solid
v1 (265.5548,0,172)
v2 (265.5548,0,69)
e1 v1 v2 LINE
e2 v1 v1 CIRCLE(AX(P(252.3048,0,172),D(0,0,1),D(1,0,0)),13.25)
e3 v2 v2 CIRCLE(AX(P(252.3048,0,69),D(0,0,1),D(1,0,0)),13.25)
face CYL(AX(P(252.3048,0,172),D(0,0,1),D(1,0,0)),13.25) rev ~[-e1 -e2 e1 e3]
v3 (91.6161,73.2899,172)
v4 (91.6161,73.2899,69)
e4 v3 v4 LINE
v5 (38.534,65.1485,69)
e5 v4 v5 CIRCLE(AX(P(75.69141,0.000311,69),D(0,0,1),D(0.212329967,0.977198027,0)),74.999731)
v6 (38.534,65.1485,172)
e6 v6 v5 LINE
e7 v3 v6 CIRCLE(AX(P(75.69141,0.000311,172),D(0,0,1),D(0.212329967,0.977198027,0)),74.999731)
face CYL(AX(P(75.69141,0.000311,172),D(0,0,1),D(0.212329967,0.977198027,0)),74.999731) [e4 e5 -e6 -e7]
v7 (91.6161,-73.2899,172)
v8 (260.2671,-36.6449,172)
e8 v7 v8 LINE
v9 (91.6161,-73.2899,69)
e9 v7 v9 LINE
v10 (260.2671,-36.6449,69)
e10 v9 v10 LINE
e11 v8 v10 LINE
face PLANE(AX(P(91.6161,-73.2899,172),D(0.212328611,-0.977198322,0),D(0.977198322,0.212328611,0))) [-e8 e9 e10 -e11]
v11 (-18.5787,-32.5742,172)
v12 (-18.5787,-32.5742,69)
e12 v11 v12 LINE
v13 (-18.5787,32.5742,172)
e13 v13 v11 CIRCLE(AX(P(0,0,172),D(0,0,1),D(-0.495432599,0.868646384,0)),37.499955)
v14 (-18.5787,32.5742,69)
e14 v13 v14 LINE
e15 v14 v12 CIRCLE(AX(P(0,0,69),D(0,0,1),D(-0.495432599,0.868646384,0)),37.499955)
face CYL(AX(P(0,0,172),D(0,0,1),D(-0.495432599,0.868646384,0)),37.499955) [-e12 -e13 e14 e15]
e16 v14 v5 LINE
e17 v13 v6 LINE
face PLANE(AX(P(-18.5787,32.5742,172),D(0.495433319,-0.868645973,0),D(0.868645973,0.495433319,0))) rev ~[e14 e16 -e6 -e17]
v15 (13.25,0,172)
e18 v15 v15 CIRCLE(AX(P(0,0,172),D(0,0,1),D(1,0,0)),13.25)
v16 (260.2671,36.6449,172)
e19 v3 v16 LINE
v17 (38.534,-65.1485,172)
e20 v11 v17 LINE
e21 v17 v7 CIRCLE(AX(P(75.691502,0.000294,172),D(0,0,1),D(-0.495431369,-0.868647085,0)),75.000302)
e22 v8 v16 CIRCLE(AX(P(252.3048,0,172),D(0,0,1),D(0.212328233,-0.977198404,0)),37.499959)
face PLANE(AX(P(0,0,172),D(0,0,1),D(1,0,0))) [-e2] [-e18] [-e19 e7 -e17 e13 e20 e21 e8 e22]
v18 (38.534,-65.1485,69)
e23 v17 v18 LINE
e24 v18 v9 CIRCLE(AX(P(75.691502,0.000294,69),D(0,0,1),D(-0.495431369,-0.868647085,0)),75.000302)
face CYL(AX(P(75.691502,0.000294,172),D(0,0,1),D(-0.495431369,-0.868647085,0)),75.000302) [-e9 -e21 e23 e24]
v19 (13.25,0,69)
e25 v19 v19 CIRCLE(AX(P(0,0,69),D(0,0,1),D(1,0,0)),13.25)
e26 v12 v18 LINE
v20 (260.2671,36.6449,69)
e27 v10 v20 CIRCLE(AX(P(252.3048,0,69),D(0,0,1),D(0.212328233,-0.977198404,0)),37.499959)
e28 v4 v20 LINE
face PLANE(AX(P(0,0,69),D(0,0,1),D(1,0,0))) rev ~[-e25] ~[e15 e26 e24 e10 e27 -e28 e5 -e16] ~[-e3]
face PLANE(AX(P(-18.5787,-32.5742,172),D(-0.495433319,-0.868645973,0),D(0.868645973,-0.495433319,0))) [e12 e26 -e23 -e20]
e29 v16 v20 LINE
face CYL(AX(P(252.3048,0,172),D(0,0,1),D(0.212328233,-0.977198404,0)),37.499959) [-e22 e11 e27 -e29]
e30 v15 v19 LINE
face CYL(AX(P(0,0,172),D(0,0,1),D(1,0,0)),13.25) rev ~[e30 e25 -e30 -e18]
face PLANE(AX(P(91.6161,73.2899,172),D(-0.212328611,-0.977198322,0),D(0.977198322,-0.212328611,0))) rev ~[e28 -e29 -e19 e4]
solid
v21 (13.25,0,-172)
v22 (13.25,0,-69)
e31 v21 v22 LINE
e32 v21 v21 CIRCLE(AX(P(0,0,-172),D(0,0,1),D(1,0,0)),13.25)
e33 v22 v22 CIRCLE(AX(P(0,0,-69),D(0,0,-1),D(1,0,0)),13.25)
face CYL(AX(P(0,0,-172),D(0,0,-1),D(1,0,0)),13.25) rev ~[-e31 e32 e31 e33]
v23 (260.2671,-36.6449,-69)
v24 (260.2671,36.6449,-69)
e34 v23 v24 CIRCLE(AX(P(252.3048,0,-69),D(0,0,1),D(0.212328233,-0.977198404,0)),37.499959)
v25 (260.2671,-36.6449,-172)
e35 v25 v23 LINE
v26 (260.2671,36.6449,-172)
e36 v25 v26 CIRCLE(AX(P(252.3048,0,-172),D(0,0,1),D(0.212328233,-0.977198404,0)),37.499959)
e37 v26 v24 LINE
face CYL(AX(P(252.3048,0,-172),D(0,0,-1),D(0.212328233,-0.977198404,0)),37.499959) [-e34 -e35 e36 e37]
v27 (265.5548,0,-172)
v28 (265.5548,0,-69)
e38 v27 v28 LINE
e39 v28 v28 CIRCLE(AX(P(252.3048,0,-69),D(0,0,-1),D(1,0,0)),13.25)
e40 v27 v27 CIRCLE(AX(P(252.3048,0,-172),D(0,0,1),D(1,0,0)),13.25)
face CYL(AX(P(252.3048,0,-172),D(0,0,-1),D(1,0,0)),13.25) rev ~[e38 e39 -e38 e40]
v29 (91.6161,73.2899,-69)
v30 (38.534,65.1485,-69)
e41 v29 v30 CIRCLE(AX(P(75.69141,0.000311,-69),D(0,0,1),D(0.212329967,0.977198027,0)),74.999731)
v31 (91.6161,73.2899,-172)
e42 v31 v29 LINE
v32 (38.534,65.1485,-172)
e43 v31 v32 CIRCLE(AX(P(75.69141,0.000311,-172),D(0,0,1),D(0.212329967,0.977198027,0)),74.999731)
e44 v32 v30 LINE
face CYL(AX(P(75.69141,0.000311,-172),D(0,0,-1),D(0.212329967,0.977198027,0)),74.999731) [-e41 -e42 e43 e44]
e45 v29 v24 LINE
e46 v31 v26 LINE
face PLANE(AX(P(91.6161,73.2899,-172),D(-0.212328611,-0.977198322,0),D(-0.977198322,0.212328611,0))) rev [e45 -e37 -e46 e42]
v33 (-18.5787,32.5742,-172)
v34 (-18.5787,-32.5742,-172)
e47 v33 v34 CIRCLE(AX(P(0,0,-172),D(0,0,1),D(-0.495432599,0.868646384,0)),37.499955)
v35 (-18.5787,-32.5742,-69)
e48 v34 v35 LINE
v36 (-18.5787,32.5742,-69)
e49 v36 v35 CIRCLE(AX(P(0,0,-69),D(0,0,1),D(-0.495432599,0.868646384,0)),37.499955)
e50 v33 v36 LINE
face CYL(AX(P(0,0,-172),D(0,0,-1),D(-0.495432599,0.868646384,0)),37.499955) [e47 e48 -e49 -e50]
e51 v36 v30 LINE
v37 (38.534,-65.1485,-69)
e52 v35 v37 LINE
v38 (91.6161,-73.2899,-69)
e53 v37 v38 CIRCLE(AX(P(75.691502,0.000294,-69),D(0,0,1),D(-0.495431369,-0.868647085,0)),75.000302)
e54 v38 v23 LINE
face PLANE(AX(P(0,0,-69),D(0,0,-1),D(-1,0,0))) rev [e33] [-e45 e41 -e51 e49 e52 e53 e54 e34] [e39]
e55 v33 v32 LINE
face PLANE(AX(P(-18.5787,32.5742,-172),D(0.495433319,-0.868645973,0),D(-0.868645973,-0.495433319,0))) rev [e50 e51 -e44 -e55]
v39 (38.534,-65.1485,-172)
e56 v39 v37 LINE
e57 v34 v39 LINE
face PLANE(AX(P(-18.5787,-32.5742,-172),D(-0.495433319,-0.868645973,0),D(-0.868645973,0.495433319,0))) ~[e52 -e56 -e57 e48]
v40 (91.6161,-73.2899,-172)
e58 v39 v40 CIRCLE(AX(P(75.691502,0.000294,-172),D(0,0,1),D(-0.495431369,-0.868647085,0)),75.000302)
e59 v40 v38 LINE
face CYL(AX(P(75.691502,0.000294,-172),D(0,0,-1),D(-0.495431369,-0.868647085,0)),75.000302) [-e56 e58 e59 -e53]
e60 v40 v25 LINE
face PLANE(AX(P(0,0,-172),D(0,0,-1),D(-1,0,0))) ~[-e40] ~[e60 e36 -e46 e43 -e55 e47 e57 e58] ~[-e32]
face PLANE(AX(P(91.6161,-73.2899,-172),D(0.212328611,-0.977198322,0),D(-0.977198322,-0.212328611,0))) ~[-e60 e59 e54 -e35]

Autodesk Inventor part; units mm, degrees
ref_plane "YZ Plane" through (0, 0, 0) normal (1, 0, 0) x (0, 1, 0)
ref_plane "XZ Plane" through (0, 0, 0) normal (0, 1, 0) x (-1, 0, 0)
ref_plane "工作平面1" through (0, 0, 172) normal (0, 0, 1) x (1, 0, 0)
sketch "草圖1" plane through (0, 0, 172) normal (0, 0, 1) x (1, 0, 0)
  line L0 (0, 0) -> (252.3048, 0) construction
  arc A0 (-18.5787, 32.5742) -> (-18.5787, -32.5742) centre (0, 0) ccw
  arc A1 (260.2671, -36.6449) -> (260.2671, 36.6449) centre (252.3048, 0) ccw
  line L1 (-18.5787, -32.5742) -> (38.534, -65.1485)
  line L2 (91.6161, 73.2899) -> (260.2671, 36.6449)
  line L3 (-18.5787, 32.5742) -> (38.534, 65.1485)
  line L4 (91.6161, -73.2899) -> (260.2671, -36.6449)
  arc A2 (38.534, -65.1485) -> (91.6161, -73.2899) centre (75.6914, 0) ccw
  arc A3 (91.6161, 73.2899) -> (38.534, 65.1485) centre (75.6914, 0) ccw
  dimension "d3" = 252.3048
  dimension "d4" = 75
  dimension "d6" = 75
  dimension "d51" = 75.6914
  dimension "d52" = 75
extrude "擠出1" add sketch "草圖1" against normal blind 103
sketch "草圖2" plane through (0, 0, 172) normal (0, 0, 1) x (1, 0, 0)
  arc A0 (-18.5787, 32.5742) -> (-18.5787, -32.5742) centre (0, 0) ccw projected
  circle A1 centre (0, 0) radius 13.25
  arc A2 (260.2671, -36.6449) -> (260.2671, 36.6449) centre (252.3048, 0) ccw projected
  circle A3 centre (252.3048, 0) radius 13.25
  point P0 (-10.9663, -35.8607)
  point P1 (-34.5251, 14.6378)
  point P2 (444.0649, 33.6154)
  point P3 (432.144, -37.2043)
  dimension "d11" = 26.5
  dimension "d13" = 26.5
extrude "擠出2" cut sketch "草圖2" against normal through all
sketch "草圖3" plane through (270.4933, 34.423, 172) normal (0.2123282, 0.9771984, 0) x (0.9771984, -0.2123282, 0)
  line L0 (-10.4648, 0) -> (-10.4648, 103) projected
  point P0 (-257.0166, 172)
  point P1 (-10.4648, 51.5)
  point P2 (-10.4648, 51.5)
hole "孔1" [suppressed]
sketch "草圖4" plane through (-8.9965, 38.0395, 172) normal (-0.4954325, 0.8686464, 0) x (0.8686464, 0.4954325, 0)
  line L0 (-11.0312, 0) -> (-11.0312, 103) projected
  point P0 (-11.0312, 172)
  point P1 (-11.0312, 51.5)
  point P2 (-11.0312, 51.5)
hole "孔2" [suppressed]
sketch "草圖6" plane through (-18.5787, -32.5742, 69) normal (-0.4954325, -0.8686464, 0) x (0.8686464, -0.4954325, 0)
  line L0 (0, 51.5) -> (0, 0) projected
  point P0 (0, -69)
  point P1 (0, 25.75)
hole "孔4" [suppressed]
sketch "草圖7" plane through (91.6161, -73.2899, 69) normal (0.2123282, -0.9771984, 0) x (0.9771984, 0.2123282, 0)
  line L0 (296.8516, 51.5) -> (296.8516, 0) projected
  point P0 (-73.9656, -69)
  point P1 (296.8516, 25.75)
hole "孔5" [suppressed]
mirror "鏡射1" about plane through (0, 0, 0) normal (0, 0, 1) of "擠出1", "擠出2"
equation "\"d3\" = R3"
equation "\"d51\" = 0.3 * R3"
equation "\"R3\" = T1A_R3"
equation "\"th3a\" = T1A_th3a"
equation "\"Width\" = T1A_R3_Width"
equation "\"d0\" = 0.5 * Width"
equation "\"T1A_R3\" = 252.3048"
equation "\"T1A_th3a\" = 45deg"
equation "\"T1A_R3_Width\" = 344"
equation "\"T1A_R1\" = 585.5331"
equation "\"T1A_R4\" = 320.6953"
equation "\"T1A_R5\" = 419.3047"
equation "\"T1A_R7\" = -221.7475"
equation "\"T1A_R8\" = 369.2781"
equation "\"T1A_R1_Width\" = 756"
equation "\"T1A_R2_Width\" = 756"
equation "\"T1A_R4_Width\" = 756"
equation "\"T1A_Joint_Width\" = 756"
properties part number "Type 1A R3延伸連接桿:1" material "密度7850的鋼"
